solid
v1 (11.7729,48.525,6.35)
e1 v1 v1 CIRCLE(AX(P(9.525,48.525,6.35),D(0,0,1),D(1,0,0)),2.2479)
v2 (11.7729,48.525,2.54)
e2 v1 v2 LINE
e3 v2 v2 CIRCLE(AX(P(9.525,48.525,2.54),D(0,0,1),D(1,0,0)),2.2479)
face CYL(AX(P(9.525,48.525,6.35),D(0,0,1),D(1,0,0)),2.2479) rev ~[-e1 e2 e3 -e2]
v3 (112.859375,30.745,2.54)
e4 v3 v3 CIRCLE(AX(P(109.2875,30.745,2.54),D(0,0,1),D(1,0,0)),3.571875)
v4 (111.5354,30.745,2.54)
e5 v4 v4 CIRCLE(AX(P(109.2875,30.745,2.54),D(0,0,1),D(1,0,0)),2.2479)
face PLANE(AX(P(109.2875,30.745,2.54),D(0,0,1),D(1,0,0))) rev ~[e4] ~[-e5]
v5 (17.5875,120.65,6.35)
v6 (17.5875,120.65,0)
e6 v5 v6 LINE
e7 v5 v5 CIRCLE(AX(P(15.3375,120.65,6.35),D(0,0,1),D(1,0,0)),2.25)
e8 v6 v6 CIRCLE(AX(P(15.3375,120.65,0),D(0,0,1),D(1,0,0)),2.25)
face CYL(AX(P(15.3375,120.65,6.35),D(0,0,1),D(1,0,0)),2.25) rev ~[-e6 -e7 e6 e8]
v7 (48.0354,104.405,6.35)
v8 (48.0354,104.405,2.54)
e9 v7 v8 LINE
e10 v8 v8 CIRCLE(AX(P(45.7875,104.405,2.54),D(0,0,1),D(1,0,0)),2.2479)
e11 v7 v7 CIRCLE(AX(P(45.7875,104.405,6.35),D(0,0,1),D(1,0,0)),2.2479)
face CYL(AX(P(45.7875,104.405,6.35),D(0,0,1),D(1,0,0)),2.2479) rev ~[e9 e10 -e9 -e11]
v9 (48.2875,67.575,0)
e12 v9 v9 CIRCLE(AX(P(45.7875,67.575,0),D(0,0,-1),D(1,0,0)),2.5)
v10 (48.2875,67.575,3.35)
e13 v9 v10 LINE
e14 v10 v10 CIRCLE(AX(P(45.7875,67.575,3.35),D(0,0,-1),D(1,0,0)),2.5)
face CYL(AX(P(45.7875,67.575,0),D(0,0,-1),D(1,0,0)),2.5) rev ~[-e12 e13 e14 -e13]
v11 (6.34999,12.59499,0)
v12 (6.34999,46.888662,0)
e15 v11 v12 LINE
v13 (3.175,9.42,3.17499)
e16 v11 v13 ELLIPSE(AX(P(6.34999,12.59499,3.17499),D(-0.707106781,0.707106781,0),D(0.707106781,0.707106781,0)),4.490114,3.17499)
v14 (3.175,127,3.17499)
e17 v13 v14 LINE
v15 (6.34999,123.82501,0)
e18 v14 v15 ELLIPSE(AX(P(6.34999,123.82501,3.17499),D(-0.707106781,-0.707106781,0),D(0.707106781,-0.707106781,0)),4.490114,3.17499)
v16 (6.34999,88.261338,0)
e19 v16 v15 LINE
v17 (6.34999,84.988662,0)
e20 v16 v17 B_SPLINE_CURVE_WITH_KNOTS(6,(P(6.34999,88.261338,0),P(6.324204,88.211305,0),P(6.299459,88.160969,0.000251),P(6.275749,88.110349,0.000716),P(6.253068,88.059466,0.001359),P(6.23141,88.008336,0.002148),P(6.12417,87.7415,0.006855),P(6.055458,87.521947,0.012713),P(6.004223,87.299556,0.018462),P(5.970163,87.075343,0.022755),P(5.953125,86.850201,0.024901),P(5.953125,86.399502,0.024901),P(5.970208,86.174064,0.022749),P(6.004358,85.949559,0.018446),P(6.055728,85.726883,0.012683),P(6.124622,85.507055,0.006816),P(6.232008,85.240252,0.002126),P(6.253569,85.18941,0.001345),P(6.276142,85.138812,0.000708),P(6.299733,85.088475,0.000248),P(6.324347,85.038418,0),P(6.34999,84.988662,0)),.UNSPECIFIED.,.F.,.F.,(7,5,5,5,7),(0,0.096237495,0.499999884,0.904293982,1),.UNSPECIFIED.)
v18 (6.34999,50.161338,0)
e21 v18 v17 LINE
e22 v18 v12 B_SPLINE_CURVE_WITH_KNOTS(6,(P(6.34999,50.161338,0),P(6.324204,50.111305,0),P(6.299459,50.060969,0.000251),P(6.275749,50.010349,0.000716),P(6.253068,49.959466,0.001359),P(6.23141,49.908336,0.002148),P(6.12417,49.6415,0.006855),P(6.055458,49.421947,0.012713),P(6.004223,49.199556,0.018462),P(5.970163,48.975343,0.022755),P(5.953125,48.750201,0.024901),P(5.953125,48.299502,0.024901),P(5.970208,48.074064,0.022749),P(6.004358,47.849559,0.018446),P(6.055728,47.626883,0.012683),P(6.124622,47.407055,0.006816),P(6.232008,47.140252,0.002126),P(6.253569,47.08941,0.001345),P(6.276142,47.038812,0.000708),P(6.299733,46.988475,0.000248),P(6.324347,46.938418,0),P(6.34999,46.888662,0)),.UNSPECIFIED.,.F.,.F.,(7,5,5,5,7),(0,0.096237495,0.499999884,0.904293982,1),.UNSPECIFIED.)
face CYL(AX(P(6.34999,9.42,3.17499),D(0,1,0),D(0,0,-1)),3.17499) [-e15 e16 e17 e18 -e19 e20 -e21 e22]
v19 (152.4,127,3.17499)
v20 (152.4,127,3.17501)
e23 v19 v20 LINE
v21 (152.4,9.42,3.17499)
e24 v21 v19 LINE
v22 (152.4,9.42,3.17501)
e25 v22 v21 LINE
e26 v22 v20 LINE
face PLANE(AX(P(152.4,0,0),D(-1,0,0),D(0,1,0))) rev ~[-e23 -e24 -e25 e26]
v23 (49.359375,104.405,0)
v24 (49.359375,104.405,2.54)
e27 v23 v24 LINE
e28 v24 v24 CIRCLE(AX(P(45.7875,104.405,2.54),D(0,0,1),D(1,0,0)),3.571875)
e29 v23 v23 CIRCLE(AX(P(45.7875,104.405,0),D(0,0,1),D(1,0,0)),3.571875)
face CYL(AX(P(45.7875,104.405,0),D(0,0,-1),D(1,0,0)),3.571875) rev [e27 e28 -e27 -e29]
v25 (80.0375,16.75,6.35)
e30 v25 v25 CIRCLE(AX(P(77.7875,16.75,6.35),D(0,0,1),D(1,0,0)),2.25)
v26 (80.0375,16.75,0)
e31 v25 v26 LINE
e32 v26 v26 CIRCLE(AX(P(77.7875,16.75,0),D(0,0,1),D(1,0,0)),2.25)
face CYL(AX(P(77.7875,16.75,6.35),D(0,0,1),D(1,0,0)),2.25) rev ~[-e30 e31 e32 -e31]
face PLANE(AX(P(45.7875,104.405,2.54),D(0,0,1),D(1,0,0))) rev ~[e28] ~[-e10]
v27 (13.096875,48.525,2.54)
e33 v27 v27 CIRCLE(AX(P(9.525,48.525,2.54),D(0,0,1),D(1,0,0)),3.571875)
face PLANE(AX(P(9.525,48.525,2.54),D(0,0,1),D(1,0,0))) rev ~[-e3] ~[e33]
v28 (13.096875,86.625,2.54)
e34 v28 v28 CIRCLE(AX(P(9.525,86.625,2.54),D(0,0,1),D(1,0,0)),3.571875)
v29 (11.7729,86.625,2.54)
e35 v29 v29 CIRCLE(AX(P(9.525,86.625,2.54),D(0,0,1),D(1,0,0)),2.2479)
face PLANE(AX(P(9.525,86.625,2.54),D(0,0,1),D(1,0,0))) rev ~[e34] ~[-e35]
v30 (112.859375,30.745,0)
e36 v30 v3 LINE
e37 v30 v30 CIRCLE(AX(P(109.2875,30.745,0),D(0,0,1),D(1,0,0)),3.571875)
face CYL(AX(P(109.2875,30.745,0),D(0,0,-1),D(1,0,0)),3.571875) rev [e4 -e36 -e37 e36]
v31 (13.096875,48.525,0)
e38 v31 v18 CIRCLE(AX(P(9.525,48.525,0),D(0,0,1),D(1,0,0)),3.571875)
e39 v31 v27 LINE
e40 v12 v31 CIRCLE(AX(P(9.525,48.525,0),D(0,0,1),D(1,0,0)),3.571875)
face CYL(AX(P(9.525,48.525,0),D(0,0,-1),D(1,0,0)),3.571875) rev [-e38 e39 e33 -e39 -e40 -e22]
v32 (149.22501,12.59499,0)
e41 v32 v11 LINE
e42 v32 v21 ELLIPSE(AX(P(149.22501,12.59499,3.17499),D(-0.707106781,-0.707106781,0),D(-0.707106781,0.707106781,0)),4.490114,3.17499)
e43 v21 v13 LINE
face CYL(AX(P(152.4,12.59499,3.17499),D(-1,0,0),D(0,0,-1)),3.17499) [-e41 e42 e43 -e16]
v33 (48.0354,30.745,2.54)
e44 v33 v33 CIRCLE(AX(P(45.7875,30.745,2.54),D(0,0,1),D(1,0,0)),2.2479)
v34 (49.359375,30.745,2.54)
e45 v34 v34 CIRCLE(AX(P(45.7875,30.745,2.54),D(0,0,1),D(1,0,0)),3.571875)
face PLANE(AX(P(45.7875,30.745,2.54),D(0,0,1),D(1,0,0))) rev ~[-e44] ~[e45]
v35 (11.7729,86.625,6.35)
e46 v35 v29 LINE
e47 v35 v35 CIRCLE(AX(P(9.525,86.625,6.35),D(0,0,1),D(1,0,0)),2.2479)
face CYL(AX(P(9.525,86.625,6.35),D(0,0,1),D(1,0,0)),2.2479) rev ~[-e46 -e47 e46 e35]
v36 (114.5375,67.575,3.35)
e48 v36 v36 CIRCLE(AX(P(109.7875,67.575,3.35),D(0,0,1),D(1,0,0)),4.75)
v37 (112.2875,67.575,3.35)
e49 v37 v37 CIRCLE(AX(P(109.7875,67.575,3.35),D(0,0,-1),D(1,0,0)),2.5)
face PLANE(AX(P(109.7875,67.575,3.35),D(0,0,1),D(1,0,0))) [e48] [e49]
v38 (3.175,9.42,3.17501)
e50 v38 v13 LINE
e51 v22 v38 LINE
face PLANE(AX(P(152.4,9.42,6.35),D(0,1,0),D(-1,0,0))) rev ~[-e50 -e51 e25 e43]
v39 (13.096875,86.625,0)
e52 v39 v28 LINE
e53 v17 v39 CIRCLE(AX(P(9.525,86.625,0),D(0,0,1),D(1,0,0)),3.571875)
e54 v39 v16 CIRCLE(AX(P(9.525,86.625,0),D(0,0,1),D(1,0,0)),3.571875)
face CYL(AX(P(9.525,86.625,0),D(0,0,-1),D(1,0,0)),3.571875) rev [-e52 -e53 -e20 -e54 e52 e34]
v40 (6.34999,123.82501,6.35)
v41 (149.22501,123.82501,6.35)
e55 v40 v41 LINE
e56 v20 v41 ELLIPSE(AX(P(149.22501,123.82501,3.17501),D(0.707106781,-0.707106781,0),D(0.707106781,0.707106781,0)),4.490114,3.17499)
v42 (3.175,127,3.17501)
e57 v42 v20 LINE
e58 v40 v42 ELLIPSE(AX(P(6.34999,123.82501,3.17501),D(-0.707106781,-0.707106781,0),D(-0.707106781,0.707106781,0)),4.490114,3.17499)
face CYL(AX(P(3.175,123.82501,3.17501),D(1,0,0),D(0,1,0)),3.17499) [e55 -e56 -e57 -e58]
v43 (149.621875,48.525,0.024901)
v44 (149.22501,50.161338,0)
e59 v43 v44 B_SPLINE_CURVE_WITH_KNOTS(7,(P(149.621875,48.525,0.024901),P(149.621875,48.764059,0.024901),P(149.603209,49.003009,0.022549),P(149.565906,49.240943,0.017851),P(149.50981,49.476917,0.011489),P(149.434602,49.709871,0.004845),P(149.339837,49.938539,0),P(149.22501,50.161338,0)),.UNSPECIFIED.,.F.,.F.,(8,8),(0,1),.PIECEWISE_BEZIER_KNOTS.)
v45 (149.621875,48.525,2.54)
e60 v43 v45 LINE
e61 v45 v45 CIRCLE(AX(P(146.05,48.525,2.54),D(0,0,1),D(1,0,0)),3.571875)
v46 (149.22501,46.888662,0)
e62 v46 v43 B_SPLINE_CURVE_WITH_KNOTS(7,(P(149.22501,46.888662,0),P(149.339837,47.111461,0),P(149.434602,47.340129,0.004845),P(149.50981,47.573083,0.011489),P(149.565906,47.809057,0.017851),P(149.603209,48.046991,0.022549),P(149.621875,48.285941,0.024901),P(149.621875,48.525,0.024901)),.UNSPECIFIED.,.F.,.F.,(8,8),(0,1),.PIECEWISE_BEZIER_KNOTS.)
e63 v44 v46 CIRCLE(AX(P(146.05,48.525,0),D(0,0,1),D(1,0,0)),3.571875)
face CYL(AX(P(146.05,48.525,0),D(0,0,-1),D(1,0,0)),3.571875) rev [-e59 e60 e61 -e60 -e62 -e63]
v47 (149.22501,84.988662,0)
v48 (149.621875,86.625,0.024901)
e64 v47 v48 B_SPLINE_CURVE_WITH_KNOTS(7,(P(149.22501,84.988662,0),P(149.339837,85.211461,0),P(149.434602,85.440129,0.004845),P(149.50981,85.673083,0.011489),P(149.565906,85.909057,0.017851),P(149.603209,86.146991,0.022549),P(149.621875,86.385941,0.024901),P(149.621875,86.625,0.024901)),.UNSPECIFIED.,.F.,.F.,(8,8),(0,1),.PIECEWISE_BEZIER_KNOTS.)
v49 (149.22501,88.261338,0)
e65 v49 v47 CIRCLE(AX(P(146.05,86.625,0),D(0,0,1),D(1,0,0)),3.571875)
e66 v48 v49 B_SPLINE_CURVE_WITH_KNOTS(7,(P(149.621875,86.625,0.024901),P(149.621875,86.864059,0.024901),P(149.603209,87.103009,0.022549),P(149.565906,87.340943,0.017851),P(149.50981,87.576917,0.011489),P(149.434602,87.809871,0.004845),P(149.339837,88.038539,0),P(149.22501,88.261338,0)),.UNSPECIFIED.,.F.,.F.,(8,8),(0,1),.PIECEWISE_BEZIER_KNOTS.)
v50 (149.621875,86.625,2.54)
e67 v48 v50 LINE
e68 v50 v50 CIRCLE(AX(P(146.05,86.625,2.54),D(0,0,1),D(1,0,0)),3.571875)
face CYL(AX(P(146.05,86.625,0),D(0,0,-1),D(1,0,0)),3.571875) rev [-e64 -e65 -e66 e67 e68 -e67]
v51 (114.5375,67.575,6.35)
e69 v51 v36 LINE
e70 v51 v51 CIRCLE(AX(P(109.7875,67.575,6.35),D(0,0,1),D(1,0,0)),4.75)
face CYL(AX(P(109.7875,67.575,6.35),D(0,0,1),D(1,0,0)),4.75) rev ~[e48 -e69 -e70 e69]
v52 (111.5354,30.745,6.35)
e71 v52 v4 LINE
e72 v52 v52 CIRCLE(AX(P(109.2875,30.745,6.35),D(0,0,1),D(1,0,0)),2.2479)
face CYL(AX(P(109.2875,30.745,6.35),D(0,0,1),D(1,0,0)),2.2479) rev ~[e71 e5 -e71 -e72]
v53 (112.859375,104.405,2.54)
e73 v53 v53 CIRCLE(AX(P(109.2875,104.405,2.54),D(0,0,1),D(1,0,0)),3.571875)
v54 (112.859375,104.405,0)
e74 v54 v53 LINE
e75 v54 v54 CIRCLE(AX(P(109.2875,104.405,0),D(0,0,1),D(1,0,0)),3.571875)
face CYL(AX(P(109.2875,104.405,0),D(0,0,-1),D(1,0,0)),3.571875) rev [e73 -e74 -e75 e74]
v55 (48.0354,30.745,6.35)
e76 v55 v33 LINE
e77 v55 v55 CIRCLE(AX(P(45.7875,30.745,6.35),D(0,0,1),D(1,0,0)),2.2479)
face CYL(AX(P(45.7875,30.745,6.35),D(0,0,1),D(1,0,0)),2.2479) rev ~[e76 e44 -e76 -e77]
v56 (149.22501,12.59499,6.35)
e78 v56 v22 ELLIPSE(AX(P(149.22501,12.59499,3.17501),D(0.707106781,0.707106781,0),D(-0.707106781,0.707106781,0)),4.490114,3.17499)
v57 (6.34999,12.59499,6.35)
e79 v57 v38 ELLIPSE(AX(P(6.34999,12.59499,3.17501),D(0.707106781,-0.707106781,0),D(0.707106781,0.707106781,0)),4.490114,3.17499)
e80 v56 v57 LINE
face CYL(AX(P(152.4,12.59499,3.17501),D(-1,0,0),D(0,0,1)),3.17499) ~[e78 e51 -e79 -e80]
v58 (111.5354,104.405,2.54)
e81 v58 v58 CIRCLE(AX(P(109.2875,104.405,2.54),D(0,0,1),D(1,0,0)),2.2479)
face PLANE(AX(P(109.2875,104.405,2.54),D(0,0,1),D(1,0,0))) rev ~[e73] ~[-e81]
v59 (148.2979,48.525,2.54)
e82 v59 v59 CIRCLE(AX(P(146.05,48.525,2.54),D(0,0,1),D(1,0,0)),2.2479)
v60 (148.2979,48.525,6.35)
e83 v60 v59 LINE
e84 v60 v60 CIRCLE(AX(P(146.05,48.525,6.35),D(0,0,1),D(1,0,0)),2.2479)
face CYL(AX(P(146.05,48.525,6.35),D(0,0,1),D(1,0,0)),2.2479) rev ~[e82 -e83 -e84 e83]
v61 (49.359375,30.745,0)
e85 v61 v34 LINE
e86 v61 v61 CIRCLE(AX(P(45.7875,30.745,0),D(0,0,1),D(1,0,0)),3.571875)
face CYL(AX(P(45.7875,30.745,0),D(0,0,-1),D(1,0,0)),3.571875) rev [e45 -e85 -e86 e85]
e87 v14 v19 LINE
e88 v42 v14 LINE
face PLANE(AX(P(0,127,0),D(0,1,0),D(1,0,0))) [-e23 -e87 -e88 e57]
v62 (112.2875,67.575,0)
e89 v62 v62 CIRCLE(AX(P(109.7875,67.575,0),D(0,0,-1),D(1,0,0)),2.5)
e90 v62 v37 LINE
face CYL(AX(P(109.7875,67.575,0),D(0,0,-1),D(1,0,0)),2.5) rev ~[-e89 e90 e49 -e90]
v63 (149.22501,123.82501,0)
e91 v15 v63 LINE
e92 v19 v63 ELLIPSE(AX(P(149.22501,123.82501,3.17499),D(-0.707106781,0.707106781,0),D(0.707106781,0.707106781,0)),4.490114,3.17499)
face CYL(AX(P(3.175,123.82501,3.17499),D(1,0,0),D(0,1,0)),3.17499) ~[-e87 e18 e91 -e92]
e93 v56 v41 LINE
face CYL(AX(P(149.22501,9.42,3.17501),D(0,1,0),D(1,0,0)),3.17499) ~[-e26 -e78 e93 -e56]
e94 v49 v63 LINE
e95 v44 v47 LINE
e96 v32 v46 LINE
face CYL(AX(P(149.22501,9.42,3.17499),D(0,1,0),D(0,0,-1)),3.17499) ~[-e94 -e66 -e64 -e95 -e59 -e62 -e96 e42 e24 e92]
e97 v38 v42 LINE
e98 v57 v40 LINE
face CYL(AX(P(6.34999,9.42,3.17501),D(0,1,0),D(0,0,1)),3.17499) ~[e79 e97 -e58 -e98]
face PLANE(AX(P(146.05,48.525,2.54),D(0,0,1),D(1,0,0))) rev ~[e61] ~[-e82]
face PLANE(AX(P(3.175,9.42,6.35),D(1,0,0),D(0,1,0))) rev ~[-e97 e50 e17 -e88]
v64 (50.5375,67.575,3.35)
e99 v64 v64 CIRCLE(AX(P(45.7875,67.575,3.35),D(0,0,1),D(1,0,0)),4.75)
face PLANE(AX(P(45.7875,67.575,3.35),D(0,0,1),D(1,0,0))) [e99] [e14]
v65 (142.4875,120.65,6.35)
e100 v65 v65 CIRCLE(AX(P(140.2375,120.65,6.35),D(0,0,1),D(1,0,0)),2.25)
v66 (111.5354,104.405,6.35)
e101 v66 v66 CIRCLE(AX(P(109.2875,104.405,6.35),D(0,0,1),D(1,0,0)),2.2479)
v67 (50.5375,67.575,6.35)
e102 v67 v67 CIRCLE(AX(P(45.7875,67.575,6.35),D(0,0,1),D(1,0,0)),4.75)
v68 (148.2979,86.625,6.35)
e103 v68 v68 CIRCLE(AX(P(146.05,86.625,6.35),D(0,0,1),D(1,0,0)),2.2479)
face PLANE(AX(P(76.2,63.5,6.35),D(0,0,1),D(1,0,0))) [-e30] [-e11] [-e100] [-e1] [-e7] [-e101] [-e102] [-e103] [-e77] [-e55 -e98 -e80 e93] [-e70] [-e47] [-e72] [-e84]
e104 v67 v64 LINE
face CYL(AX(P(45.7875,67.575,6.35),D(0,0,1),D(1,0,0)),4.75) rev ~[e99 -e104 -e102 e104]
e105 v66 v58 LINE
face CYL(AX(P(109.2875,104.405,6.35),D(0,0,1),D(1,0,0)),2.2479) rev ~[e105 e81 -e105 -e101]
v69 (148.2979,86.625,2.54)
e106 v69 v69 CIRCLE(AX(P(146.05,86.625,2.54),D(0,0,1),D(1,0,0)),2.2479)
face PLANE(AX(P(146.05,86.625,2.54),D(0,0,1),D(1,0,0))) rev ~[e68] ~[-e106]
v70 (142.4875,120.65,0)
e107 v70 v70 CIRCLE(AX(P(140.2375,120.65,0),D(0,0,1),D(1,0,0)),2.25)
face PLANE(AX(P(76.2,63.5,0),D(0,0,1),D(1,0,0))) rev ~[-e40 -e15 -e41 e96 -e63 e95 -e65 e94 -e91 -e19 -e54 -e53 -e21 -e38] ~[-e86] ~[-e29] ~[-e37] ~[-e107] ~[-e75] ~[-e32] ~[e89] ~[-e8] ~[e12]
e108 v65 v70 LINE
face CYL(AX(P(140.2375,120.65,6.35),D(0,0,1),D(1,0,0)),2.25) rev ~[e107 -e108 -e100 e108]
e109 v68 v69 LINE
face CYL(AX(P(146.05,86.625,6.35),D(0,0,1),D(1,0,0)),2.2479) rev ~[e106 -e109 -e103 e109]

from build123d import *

# Parameters (mm, degrees)
F0_W      = 152.4
F0_H      = 127
F1_DEPTH  = 6.35
F2_R      = 2.25
F3_DEPTH  = 6.351
F4_R      = 2.5
F5_DEPTH  = 25.4
F6_R      = 4.75
F7_DEPTH  = 3
F8_R      = 2.2479
F9_DEPTH  = 6.351
F10_W     = 3.175
F10_H     = 9.42
F10_W_2   = 149.225
F10_H_2   = 117.58
F11_DEPTH = 6.351
F12_R     = 3.17499
F13_R     = 3.571875
F14_DEPTH = 2.54


# Not quite as in the source:
# - a fillet or chamfer is up to 0.001 mm smaller than in the source, because OpenCascade refuses the exact size


with BuildPart() as f1:
    # F0 (on Top) → F1 (new body)
    with BuildSketch(Plane.XY):
        with Locations((76.2, 63.5)):
            Rectangle(F0_W, F0_H)
    extrude(amount=F1_DEPTH)

    # F2 (on face) → F3 (cut, through all)
    with BuildSketch(Plane.XY.offset(6.35)):
        with Locations((15.3375, 120.65)):
            Circle(F2_R)
        with Locations((140.2375, 120.65)):
            Circle(F2_R)
        with Locations((77.7875, 16.75)):
            Circle(F2_R)
    extrude(amount=-F3_DEPTH, mode=Mode.SUBTRACT)

    # F4 (on face) → F5 (cut)
    with BuildSketch(Plane(origin=(0, 0, 0), x_dir=(1, 0, 0), z_dir=(0, 0, -1))):
        with Locations((45.7875, -67.575)):
            Circle(F4_R)
        with Locations((109.7875, -67.575)):
            Circle(F4_R)
    extrude(amount=-F5_DEPTH, mode=Mode.SUBTRACT)

    # F6 (on face) → F7 (cut)
    with BuildSketch(Plane.XY.offset(6.35)):
        with Locations((45.7875, 67.575)):
            Circle(F6_R)
        with Locations((109.7875, 67.575)):
            Circle(F6_R)
    extrude(amount=-F7_DEPTH, mode=Mode.SUBTRACT)

    # F8 (on face) → F9 (cut, through all)
    with BuildSketch(Plane.XY.offset(6.35)):
        with Locations((146.05, 86.625)):
            Circle(F8_R)
        with Locations((146.05, 48.525)):
            Circle(F8_R)
        with Locations((9.525, 48.525)):
            Circle(F8_R)
        with Locations((9.525, 86.625)):
            Circle(F8_R)
        with Locations((45.7875, 104.405)):
            Circle(F8_R)
        with Locations((109.2875, 104.405)):
            Circle(F8_R)
        with Locations((45.7875, 30.745)):
            Circle(F8_R)
        with Locations((109.2875, 30.745)):
            Circle(F8_R)
    extrude(amount=-F9_DEPTH, mode=Mode.SUBTRACT)

    # F10 (on face) → F11 (cut, through all)
    with BuildSketch(Plane.XY.offset(6.35)):
        with Locations((1.5875, 4.71)):
            Rectangle(F10_W, F10_H)
        with Locations((77.7875, 4.71)):
            Rectangle(F10_W_2, F10_H)
        with Locations((1.5875, 68.21)):
            Rectangle(F10_W, F10_H_2)
    extrude(amount=-F11_DEPTH, mode=Mode.SUBTRACT)

    # F12 (radius 3.175 in the source; OpenCascade refuses exactly that, so slightly less here)
    f12_edges = [f1.edges().sort_by_distance(p)[0] for p in [
        (3.175, 68.21, 6.35),
        (77.7875, 9.42, 6.35),
        (152.4, 68.21, 6.35),
        (77.7875, 127, 6.35),
        (77.7875, 127, 0),
        (3.175, 68.21, 0),
        (77.7875, 9.42, 0),
        (152.4, 68.21, 0),
    ]]
    fillet(f12_edges, radius=F12_R)

    # F13 (on face) → F14 (cut)
    with BuildSketch(Plane.XY):
        with Locations((45.7875, 30.745)):
            Circle(F13_R)
        with Locations((109.2875, 30.745)):
            Circle(F13_R)
        with Locations((9.525, 48.525)):
            Circle(F13_R)
        with Locations((9.525, 86.625)):
            Circle(F13_R)
        with Locations((45.7875, 104.405)):
            Circle(F13_R)
        with Locations((109.2875, 104.405)):
            Circle(F13_R)
        with Locations((146.05, 86.625)):
            Circle(F13_R)
        with Locations((146.05, 48.525)):
            Circle(F13_R)
    extrude(amount=F14_DEPTH, mode=Mode.SUBTRACT)


solid = f1.part
